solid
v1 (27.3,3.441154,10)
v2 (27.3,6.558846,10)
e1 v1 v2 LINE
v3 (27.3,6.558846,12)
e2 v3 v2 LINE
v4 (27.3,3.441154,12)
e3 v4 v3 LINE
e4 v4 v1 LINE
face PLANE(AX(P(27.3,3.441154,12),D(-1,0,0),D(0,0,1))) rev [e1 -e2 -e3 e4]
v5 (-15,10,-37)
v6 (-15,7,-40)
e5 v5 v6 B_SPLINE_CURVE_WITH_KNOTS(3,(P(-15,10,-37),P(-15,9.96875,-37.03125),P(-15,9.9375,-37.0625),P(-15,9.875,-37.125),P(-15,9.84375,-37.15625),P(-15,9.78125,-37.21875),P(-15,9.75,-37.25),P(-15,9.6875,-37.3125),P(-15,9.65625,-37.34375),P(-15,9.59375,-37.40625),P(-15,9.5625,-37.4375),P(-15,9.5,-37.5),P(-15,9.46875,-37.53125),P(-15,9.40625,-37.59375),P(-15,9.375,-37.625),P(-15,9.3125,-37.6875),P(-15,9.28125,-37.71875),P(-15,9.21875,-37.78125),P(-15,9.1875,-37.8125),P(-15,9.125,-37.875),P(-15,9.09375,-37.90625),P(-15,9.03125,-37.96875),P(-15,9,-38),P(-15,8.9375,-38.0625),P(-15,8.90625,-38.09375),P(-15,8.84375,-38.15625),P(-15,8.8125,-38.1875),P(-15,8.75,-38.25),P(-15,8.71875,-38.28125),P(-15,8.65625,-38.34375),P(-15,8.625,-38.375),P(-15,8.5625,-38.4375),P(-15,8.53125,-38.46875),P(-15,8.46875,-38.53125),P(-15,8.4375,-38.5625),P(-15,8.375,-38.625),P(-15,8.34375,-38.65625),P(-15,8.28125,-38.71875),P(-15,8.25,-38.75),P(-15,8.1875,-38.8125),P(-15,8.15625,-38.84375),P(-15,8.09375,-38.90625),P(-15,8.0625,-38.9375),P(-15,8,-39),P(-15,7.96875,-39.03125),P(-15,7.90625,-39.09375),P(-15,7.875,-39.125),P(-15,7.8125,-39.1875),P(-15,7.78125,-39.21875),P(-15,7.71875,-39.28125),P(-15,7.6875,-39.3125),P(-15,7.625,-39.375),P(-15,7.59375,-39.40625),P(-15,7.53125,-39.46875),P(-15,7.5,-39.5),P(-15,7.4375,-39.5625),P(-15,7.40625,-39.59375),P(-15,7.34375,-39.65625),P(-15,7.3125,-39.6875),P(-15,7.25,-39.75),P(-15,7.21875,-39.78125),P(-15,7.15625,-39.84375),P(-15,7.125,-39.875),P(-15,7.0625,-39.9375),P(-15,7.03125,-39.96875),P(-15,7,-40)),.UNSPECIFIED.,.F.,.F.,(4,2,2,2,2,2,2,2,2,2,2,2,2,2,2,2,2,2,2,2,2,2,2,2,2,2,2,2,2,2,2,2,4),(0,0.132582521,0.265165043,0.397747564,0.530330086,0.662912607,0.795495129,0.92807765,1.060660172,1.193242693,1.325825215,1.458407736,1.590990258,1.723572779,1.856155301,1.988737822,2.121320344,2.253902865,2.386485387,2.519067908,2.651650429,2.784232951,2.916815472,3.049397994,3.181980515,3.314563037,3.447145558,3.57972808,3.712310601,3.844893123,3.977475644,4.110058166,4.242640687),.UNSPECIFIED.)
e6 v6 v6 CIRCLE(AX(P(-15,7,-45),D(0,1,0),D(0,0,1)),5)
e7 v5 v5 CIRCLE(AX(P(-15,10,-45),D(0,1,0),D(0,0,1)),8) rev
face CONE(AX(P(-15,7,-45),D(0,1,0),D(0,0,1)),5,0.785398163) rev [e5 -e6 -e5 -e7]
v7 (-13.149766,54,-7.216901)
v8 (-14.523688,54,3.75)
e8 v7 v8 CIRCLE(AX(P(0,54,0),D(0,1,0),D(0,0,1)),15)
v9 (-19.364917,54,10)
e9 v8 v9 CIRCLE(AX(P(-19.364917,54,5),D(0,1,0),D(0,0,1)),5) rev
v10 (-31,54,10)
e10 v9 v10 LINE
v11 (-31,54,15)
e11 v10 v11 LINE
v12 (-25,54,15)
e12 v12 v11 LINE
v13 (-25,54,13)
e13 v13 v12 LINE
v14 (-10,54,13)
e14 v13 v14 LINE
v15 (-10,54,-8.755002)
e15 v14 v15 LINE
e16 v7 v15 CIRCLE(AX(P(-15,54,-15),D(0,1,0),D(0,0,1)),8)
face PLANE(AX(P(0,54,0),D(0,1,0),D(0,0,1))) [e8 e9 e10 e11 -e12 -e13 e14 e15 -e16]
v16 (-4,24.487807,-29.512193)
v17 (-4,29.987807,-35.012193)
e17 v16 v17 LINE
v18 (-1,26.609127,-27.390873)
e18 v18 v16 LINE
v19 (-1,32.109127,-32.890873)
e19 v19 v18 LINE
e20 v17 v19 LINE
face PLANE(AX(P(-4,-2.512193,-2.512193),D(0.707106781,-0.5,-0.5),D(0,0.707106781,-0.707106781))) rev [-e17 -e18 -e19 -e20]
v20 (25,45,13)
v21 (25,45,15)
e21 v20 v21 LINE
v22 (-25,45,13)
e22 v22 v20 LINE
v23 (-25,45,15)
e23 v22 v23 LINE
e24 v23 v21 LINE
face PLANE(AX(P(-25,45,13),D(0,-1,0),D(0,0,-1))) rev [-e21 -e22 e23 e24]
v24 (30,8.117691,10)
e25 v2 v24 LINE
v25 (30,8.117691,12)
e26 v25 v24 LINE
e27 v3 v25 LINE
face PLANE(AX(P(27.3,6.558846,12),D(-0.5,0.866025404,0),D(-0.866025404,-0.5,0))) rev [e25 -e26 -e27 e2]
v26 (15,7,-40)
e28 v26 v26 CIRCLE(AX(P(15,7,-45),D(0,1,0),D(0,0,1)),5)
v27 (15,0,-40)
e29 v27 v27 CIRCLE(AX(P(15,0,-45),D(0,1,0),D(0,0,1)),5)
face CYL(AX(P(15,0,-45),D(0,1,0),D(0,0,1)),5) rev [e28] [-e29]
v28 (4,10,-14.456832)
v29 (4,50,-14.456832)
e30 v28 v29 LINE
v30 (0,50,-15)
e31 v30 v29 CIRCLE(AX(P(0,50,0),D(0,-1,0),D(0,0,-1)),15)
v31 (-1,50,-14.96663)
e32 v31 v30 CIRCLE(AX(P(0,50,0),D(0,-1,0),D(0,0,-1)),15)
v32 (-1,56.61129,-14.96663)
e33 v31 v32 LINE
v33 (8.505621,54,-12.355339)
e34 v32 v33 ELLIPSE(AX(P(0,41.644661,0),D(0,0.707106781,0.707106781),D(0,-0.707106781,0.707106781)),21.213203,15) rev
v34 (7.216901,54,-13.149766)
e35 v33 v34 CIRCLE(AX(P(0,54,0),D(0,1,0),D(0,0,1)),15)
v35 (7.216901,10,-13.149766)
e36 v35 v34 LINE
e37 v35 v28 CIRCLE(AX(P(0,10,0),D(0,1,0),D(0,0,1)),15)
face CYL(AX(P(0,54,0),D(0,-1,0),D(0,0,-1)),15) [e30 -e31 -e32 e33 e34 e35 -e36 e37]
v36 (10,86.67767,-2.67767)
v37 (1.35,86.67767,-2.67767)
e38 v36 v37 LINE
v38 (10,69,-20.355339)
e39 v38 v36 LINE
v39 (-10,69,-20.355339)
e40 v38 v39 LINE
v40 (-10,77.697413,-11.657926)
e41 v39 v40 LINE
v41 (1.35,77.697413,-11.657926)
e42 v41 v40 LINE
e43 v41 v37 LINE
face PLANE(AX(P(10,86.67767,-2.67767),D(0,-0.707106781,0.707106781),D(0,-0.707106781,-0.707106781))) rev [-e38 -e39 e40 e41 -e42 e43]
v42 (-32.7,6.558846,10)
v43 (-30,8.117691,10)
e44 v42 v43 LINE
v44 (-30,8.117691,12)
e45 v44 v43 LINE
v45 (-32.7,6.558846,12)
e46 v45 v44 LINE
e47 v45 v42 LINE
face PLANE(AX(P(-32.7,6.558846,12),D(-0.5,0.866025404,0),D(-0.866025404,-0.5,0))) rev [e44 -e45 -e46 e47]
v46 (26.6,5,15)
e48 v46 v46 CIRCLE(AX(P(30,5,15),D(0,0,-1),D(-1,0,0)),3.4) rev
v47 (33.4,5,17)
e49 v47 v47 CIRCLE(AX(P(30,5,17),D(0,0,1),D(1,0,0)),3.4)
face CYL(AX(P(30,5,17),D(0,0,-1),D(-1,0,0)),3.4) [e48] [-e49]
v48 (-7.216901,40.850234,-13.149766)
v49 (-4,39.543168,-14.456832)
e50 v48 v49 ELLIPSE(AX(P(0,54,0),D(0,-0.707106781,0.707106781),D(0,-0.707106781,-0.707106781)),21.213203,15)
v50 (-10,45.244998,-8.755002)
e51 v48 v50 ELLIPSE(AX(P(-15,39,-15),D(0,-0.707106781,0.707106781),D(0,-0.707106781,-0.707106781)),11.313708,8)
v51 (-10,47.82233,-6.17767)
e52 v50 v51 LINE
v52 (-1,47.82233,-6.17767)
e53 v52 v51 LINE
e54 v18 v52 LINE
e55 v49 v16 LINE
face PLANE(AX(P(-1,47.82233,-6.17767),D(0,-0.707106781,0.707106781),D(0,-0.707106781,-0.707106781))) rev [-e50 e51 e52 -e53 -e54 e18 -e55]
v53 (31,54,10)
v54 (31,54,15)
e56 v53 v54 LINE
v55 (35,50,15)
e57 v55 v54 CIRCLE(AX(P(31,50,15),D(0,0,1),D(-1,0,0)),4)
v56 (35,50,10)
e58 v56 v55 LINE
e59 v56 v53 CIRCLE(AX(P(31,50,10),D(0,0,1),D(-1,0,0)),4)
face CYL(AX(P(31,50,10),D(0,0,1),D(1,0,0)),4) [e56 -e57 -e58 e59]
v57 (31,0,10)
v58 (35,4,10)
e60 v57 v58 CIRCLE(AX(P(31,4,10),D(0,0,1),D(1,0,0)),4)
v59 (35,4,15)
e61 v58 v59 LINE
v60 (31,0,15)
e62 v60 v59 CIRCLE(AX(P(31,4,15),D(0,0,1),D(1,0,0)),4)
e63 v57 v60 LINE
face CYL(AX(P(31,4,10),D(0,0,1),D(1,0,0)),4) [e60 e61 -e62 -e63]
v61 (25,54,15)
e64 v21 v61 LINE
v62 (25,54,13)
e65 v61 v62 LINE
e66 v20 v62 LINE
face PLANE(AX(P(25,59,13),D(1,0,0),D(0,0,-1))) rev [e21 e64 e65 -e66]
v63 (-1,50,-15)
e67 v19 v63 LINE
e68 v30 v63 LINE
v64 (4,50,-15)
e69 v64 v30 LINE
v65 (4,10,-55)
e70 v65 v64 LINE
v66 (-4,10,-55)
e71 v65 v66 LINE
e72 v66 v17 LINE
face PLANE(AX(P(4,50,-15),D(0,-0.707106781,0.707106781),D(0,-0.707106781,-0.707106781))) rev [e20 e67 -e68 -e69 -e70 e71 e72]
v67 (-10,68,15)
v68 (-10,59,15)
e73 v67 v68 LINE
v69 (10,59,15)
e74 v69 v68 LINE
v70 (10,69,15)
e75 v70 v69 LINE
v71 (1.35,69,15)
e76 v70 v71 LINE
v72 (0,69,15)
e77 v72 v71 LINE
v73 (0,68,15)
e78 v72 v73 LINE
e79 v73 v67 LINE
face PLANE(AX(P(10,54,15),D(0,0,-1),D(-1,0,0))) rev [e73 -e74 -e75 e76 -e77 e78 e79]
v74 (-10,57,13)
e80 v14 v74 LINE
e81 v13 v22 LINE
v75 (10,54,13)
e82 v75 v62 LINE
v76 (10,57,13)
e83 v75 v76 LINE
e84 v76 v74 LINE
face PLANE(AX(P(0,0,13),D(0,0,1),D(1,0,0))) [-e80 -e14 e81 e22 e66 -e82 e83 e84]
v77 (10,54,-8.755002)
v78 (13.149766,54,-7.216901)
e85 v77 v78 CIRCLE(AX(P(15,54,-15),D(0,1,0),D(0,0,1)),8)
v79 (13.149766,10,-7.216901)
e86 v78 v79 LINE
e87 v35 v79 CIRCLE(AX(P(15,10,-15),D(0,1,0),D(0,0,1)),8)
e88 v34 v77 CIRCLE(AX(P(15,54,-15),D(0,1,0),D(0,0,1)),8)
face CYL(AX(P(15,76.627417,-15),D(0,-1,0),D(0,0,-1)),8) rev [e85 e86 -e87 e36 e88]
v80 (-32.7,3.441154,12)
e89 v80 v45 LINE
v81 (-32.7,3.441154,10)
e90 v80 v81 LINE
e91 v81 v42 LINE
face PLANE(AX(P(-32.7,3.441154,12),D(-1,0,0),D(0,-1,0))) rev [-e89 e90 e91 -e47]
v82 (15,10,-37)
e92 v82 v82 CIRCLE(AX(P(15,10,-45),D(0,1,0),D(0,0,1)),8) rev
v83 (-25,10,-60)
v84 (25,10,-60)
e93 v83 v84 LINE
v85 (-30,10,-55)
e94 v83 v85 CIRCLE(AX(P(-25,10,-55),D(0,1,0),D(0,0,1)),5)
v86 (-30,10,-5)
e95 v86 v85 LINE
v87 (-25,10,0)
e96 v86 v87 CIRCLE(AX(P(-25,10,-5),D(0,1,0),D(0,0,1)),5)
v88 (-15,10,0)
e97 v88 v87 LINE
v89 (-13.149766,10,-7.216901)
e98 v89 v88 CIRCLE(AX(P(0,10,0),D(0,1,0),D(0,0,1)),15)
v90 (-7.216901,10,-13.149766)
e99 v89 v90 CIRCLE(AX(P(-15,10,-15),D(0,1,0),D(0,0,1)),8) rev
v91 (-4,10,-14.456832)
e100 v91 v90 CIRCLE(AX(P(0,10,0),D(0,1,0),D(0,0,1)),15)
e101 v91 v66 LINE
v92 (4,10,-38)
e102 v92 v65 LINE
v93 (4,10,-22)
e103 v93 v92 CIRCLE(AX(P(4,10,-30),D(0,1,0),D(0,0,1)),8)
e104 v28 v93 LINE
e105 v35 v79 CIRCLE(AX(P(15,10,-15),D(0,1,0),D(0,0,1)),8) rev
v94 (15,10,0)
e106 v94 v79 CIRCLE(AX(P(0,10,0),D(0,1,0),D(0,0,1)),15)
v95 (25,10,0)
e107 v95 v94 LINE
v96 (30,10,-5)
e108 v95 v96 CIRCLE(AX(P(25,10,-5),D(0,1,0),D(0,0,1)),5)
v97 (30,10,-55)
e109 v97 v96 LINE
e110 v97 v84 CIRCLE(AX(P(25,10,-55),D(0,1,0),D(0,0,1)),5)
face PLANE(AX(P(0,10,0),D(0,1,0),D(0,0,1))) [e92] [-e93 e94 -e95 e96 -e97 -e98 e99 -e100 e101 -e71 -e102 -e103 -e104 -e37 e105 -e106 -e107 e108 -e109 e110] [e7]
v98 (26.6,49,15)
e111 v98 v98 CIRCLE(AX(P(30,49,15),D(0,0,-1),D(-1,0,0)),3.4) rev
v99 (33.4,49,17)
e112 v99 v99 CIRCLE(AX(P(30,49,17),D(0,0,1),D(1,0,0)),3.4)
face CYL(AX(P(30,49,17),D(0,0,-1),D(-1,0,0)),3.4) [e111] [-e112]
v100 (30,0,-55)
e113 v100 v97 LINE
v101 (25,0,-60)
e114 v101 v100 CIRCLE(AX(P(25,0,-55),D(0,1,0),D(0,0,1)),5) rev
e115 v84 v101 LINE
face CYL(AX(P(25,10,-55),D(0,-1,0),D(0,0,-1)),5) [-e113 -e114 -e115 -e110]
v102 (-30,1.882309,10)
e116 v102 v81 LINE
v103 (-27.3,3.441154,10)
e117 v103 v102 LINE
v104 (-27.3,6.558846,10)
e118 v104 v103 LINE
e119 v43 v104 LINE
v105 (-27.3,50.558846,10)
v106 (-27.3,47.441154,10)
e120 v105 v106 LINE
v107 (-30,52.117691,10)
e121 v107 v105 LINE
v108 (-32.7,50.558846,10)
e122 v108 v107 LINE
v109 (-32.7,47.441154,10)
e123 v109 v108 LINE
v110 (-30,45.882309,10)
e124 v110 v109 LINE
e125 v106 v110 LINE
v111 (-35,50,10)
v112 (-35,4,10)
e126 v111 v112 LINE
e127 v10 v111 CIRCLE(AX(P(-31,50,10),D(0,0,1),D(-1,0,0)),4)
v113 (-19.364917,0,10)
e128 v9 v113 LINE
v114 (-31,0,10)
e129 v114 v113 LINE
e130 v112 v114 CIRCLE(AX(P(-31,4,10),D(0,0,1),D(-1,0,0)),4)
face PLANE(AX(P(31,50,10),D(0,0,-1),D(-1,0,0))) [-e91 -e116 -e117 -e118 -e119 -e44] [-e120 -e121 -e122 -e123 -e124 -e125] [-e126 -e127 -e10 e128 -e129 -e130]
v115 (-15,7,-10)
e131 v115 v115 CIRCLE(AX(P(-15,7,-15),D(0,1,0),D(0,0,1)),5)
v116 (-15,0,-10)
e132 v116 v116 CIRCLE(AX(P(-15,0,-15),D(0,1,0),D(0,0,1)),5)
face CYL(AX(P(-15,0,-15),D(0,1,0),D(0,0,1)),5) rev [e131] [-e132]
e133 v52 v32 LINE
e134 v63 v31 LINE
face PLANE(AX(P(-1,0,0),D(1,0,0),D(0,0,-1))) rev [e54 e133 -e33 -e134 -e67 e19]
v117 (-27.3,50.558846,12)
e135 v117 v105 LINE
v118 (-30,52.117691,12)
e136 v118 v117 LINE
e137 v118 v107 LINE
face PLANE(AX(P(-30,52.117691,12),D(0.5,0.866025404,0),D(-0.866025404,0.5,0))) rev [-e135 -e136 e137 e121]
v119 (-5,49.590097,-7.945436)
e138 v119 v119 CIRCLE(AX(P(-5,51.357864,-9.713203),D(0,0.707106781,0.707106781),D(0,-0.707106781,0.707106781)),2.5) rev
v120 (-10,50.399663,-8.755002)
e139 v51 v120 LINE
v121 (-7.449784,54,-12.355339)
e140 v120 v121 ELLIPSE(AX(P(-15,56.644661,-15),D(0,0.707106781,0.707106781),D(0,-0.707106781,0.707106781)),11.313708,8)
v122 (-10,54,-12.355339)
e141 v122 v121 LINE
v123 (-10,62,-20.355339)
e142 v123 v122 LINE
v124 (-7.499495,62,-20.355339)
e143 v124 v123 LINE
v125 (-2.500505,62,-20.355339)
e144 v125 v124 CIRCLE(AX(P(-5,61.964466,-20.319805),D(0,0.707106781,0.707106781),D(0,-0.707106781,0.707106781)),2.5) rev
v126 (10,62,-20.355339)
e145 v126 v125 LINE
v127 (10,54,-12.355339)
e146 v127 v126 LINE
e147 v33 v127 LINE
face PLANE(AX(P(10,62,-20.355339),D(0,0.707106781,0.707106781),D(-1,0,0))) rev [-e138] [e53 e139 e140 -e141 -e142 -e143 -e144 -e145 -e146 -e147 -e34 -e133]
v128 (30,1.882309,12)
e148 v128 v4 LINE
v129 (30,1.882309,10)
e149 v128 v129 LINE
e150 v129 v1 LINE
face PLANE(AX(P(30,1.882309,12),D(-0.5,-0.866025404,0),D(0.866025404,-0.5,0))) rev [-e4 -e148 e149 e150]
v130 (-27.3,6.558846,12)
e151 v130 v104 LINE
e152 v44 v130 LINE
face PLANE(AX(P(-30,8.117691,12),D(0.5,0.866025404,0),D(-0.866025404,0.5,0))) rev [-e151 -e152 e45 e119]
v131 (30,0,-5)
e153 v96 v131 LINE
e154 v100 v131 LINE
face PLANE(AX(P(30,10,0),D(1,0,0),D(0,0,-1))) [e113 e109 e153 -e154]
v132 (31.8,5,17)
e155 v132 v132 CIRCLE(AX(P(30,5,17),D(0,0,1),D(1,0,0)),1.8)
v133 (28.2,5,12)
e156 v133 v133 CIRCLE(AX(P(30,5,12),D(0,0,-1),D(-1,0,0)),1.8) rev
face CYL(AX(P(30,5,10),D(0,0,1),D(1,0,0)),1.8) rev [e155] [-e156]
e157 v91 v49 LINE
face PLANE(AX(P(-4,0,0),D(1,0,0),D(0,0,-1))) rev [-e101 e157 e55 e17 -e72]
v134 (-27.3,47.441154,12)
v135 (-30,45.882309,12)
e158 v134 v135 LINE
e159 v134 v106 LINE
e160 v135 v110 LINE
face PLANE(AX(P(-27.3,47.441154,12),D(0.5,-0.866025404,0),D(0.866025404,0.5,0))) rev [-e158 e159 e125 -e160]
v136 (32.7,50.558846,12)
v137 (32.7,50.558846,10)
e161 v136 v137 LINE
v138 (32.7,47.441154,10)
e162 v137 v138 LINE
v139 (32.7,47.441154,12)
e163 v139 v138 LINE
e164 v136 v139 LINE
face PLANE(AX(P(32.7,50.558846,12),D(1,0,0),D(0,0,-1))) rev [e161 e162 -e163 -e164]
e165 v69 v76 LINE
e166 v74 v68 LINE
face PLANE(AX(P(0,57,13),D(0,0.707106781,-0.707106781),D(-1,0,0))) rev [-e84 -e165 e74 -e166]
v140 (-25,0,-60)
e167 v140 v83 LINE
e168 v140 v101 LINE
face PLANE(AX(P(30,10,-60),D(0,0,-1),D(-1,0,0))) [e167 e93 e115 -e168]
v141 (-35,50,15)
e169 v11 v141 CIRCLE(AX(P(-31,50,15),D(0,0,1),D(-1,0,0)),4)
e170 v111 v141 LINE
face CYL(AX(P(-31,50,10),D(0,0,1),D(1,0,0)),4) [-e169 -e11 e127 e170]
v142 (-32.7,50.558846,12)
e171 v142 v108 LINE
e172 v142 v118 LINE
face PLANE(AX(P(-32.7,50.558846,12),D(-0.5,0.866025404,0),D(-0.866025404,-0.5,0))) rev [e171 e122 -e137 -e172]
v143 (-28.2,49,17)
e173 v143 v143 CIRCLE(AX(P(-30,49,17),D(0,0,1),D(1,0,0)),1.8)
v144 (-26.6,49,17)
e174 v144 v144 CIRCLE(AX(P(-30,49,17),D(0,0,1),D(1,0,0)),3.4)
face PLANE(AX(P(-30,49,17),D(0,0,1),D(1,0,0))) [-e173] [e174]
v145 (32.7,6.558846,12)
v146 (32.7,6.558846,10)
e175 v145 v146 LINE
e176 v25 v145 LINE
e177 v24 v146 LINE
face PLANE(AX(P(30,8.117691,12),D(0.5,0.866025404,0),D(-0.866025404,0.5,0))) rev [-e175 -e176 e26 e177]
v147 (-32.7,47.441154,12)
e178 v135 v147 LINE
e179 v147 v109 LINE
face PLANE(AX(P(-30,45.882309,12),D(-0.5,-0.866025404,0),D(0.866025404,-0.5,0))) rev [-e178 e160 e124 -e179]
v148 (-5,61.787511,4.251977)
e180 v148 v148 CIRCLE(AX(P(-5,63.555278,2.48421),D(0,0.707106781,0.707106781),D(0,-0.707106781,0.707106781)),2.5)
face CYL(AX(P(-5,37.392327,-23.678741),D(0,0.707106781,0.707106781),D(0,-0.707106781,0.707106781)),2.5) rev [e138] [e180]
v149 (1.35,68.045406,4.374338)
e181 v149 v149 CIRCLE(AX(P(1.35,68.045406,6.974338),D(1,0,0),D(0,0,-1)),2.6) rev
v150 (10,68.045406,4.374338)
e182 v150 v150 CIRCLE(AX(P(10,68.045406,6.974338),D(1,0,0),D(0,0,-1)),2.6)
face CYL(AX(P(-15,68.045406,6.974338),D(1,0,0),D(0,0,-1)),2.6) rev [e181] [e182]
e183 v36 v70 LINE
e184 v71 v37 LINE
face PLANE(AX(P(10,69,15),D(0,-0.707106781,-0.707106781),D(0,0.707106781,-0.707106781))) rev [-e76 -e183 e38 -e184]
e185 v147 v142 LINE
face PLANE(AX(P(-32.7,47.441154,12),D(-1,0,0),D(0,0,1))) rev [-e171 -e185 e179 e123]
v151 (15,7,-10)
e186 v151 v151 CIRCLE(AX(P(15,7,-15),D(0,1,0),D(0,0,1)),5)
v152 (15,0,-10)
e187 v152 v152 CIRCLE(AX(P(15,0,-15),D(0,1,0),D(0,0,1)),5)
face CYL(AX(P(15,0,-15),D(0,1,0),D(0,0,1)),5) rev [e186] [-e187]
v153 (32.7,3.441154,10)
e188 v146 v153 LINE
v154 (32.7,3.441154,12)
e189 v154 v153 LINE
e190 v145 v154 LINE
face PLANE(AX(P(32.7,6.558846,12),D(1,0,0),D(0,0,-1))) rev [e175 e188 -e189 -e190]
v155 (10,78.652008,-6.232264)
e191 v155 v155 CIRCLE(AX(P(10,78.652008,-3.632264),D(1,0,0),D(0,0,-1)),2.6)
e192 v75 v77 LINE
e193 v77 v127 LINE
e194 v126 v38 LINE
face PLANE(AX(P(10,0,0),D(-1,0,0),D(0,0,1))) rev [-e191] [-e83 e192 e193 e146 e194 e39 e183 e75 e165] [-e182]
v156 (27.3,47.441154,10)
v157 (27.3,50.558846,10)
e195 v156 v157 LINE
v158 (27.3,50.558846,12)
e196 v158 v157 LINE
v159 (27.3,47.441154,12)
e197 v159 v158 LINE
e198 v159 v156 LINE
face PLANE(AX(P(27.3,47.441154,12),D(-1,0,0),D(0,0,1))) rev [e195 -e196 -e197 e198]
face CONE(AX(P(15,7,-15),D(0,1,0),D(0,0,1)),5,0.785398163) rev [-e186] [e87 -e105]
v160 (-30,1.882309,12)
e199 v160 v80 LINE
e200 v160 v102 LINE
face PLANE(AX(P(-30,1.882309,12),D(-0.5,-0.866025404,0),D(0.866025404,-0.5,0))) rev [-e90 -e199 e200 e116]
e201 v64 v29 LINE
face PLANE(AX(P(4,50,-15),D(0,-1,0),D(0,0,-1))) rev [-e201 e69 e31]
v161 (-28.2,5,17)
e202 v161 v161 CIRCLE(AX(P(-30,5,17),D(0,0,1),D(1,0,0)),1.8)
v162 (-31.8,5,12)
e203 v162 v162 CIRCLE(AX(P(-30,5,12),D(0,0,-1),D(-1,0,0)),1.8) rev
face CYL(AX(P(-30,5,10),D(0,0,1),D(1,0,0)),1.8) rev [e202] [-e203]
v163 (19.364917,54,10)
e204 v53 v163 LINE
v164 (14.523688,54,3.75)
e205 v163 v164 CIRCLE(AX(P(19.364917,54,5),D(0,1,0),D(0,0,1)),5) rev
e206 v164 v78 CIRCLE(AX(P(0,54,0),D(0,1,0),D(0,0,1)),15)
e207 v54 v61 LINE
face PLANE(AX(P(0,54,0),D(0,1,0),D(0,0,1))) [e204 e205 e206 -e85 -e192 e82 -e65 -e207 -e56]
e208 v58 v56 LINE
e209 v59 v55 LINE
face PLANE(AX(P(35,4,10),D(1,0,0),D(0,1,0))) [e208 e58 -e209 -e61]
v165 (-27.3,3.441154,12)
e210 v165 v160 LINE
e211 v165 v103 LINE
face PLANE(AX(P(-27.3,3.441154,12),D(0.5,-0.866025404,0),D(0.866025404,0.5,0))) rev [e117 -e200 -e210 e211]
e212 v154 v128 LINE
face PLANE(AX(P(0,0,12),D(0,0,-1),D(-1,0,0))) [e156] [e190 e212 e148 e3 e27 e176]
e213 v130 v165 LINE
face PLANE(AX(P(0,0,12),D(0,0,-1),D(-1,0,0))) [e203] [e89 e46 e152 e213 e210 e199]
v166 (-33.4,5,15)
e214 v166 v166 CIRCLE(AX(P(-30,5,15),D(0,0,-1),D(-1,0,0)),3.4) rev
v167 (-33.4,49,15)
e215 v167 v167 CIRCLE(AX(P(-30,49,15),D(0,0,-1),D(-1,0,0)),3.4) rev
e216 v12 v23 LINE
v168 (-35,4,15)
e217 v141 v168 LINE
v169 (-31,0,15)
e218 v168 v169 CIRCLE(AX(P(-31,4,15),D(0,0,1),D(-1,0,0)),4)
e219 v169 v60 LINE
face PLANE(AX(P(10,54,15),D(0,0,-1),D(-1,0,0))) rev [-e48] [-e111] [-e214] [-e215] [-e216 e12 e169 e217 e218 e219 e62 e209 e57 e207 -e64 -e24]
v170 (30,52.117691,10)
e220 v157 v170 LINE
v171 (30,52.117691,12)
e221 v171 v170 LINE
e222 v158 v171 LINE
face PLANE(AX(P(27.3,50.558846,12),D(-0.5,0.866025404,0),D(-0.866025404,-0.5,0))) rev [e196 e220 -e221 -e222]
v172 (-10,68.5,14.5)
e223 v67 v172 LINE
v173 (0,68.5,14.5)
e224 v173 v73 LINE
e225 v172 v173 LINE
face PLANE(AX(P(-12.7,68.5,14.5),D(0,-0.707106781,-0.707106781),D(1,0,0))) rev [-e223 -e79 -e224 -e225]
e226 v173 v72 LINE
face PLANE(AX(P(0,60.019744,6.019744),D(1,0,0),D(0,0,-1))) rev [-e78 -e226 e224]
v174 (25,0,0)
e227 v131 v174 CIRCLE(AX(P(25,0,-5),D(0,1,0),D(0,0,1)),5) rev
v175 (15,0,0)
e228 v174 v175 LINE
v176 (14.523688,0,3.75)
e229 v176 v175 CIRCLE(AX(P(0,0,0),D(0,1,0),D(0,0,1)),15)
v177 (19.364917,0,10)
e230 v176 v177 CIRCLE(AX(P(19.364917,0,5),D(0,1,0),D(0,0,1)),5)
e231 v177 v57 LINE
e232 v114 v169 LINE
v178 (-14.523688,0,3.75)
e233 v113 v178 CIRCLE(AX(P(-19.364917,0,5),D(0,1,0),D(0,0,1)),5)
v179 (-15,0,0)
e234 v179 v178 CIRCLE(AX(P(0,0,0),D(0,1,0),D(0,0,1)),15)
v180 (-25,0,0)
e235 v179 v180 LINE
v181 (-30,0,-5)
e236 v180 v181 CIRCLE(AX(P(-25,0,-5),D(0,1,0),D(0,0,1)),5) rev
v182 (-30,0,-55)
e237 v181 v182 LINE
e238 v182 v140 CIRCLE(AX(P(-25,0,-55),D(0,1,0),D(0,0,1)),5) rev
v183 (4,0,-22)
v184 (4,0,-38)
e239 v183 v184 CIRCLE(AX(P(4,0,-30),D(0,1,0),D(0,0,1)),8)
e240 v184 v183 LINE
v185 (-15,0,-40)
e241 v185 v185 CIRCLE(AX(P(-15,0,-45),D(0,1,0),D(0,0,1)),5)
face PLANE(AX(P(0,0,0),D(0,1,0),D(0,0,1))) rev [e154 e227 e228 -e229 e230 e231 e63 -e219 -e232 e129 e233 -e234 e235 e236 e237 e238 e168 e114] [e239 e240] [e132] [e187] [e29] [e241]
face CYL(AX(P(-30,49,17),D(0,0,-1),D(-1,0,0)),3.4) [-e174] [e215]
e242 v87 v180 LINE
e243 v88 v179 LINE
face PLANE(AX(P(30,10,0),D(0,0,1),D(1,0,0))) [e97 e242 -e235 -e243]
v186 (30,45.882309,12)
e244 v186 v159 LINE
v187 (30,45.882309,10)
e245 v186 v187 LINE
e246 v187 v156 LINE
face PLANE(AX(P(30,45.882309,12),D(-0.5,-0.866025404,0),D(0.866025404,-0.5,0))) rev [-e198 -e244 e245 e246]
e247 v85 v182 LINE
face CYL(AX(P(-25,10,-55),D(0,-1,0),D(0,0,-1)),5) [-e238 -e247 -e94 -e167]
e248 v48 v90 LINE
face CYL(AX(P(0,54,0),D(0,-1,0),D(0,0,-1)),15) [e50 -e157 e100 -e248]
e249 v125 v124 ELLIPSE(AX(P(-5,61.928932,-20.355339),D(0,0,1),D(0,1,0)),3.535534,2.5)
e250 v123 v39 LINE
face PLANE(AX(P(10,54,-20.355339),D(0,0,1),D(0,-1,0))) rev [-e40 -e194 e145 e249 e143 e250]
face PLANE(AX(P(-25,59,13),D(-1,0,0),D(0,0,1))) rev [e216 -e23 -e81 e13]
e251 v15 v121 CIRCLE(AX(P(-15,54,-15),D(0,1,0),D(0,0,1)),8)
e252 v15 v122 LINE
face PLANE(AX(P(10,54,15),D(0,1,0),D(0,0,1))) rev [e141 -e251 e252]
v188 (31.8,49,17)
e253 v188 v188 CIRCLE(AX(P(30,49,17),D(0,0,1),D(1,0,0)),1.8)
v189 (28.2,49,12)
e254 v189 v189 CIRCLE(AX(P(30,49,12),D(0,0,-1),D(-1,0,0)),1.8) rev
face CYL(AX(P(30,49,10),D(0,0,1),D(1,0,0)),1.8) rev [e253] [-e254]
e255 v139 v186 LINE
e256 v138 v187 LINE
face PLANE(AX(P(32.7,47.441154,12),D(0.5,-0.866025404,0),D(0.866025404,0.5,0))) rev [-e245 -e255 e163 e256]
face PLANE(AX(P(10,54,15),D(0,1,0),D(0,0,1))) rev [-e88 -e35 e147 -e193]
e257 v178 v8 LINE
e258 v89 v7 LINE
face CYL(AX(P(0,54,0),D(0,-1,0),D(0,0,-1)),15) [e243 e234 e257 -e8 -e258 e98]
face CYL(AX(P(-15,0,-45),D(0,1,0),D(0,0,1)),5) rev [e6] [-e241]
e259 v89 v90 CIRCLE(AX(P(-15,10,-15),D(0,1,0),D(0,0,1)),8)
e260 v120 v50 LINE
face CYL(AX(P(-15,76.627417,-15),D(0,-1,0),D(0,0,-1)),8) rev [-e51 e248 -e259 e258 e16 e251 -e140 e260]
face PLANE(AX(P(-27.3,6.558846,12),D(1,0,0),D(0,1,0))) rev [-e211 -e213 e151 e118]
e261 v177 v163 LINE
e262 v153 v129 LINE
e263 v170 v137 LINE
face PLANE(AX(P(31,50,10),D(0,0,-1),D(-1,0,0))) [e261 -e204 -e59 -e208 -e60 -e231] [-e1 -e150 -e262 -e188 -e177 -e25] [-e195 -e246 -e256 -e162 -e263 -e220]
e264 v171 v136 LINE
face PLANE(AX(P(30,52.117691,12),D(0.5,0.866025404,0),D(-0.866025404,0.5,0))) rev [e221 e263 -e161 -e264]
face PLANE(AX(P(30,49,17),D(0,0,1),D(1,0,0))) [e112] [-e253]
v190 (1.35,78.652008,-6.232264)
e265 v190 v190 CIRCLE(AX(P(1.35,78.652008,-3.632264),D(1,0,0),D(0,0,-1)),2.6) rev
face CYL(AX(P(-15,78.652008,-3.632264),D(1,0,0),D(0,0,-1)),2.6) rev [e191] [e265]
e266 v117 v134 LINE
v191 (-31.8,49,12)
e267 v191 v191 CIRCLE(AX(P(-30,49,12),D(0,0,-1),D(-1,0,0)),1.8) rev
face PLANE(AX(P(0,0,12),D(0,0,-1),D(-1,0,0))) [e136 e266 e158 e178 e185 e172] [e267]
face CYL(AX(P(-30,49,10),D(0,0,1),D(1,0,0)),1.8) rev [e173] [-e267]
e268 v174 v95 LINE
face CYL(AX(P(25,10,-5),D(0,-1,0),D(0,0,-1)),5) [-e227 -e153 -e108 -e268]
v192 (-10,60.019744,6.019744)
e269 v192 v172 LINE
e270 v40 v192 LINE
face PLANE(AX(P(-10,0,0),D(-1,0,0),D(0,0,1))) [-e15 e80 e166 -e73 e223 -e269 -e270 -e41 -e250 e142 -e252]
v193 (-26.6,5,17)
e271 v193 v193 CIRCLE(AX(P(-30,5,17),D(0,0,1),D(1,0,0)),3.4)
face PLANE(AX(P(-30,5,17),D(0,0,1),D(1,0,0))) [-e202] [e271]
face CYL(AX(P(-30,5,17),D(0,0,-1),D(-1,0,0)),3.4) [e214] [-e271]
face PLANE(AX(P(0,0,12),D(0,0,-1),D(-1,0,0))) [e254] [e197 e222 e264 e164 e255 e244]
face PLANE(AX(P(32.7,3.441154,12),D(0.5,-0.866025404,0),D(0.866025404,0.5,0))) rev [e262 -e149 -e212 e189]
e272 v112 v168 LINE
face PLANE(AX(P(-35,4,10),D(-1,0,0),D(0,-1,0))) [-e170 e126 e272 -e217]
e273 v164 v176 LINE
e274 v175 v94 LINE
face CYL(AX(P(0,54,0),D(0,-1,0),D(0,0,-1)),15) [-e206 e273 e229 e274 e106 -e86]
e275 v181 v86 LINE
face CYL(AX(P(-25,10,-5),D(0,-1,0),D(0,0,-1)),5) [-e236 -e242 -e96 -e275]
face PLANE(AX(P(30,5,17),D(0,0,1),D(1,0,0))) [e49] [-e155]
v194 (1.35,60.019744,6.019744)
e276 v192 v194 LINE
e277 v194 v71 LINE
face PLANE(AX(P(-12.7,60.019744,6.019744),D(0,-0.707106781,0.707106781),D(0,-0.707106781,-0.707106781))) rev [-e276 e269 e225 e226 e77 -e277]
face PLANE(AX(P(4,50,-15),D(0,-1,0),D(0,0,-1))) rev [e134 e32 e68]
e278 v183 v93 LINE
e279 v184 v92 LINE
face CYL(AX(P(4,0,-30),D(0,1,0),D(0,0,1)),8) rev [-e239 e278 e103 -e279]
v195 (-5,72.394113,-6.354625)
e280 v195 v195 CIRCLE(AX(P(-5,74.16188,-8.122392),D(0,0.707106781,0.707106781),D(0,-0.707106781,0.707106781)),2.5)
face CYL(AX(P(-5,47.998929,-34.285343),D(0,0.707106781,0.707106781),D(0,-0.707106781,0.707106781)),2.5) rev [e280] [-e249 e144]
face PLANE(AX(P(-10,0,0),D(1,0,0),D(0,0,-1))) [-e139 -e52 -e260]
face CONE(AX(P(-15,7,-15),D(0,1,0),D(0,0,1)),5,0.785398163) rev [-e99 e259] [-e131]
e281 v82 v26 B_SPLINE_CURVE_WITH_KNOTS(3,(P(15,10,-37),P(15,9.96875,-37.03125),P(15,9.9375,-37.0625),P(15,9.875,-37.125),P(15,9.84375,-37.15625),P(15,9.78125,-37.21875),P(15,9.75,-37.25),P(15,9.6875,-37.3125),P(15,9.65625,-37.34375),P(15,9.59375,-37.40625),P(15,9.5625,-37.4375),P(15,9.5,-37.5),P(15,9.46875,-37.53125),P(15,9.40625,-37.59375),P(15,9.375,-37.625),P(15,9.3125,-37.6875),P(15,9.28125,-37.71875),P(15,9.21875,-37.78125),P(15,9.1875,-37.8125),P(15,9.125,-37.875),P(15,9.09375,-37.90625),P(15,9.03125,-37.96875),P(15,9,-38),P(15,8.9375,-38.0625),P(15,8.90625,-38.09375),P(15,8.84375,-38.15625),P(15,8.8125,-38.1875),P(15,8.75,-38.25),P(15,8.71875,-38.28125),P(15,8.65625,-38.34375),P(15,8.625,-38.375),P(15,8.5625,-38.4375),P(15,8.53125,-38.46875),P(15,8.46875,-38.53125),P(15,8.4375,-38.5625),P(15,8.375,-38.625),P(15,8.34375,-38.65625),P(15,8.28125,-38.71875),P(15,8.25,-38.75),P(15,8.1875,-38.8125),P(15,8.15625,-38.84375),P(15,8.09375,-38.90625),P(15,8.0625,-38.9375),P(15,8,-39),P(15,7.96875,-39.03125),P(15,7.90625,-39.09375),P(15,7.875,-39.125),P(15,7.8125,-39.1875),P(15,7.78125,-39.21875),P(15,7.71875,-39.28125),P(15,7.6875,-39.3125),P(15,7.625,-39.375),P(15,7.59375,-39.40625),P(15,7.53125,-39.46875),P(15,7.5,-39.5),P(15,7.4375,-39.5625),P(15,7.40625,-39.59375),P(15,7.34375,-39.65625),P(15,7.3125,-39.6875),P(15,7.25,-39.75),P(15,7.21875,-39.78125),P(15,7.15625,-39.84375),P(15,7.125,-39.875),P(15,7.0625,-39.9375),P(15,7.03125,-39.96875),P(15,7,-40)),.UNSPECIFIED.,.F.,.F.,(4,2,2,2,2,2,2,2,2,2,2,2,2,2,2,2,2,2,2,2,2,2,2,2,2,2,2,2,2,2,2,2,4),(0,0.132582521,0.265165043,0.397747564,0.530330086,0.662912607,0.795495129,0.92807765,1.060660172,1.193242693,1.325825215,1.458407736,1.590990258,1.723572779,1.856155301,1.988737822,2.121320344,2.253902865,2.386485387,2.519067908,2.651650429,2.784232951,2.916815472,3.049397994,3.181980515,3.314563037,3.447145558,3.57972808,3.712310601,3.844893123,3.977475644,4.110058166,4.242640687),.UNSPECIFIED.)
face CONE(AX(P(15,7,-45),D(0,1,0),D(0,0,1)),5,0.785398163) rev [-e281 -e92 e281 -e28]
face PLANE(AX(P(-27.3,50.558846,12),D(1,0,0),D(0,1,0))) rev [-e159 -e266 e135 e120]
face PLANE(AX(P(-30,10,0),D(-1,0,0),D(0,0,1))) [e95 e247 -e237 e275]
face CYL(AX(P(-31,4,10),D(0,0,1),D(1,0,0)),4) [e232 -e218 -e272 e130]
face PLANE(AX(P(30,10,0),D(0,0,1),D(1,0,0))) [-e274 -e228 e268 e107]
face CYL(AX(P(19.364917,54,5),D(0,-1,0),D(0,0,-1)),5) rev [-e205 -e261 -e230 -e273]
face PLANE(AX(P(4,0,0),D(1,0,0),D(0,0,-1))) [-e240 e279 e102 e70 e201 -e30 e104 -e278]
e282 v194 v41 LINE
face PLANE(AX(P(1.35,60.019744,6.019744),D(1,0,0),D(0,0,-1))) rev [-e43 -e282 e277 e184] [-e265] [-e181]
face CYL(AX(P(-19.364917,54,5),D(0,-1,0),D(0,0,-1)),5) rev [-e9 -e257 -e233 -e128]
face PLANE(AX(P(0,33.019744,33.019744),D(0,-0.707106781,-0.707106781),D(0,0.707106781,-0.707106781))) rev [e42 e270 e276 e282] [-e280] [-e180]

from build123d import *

# Parameters (mm, degrees)
SKETCH1_R           = 15
BOSS_EXTRUDE1_DEPTH = 54
BOSS_EXTRUDE2_DEPTH = 10
SKETCH4_W           = 12.7
SKETCH4_H           = 25
CUT_EXTRUDE2_DEPTH  = 12.7
CHAMFER1_SIZE       = 1
CHAMFER1_SIZE2      = 0.707106781
SKETCH6_R           = 2.6
CUT_EXTRUDE3_DEPTH  = 93.478960977
SKETCH7_R           = 1.8
BOSS_EXTRUDE4_DEPTH = 5
FILLET1_R           = 5
SKETCH8_W           = 60
SKETCH8_H           = 60
BOSS_EXTRUDE5_DEPTH = 10
BOSS_EXTRUDE6_DEPTH = 4
FILLET2_R           = 5
SKETCH10_R          = 5
CUT_EXTRUDE4_DEPTH  = 104.462384491
CHAMFER2_SIZE       = 8
EXTRUDE_THIN1_START = 2
SKETCH11_R          = 3.4
SKETCH11_R_2        = 1.8
EXTRUDE_THIN1_DEPTH = 2
SKETCH12_W          = 50
SKETCH12_H          = 14
CUT_EXTRUDE5_DEPTH  = 2
CHAMFER3_SIZE       = 2
CUT_EXTRUDE6_DEPTH  = 2
SKETCH14_R          = 8
CUT_EXTRUDE7_DEPTH  = 44
CHAMFER4_SIZE       = 3
CUT_EXTRUDE8_DEPTH  = 104.462384491
SKETCH26_R          = 2.5
CUT_EXTRUDE16_DEPTH = 37
CUT_EXTRUDE17_DEPTH = 9
CHAMFER6_SIZE       = 3
SKETCH29_W          = 1.35
SKETCH29_H          = 25
CUT_EXTRUDE18_DEPTH = 12.7


# Some blends are built 0.0001 mm under size
with BuildPart() as part:
    # Sketch1 → Boss-Extrude1 (new body)
    with BuildSketch(Plane(origin=(0, 0, 0), x_dir=(1, 0, 0), z_dir=(0, 1, 0))):
        with Locations(Location((0, 0, 0), (0, 0, 270))):
            Circle(SKETCH1_R)
    extrude(amount=BOSS_EXTRUDE1_DEPTH)

    # Sketch2 → Boss-Extrude2 (add, symmetric)
    with BuildSketch(Plane(origin=(0, 0, 0), x_dir=(0, 0, -1), z_dir=(1, 0, 0))):
        Polygon((-15, 54), (20.355339059, 54), (20.355339059, 69), (2.67766953, 86.67766953), (-15, 69), align=None)
    extrude(amount=BOSS_EXTRUDE2_DEPTH, both=True)

    # Sketch4 → Cut-Extrude2 (cut)
    with BuildSketch(Plane(origin=(0, 42, 42), x_dir=(1, 0, 0), z_dir=(0, 0.7071067811865467, 0.7071067811865485))):
        with Locations((-6.35, 50.683766184)):
            Rectangle(SKETCH4_W, SKETCH4_H)
    extrude(amount=-CUT_EXTRUDE2_DEPTH, mode=Mode.SUBTRACT)

    # Chamfer1
    chamfer1_edges = [part.edges().sort_by_distance(p)[0] for p in [
        (-5, 69, 15),
    ]]
    chamfer1_side = [part.faces().sort_by_distance(p)[0] for p in [
        (0, 61.5, 15),
    ]]
    chamfer(chamfer1_edges, length=CHAMFER1_SIZE, length2=CHAMFER1_SIZE2, reference=chamfer1_side[0])

    # Sketch6 → Cut-Extrude3 (cut, through all)
    with BuildSketch(Plane(origin=(10, 0, 0), x_dir=(0, 0, -1), z_dir=(1, 0, 0))):
        with Locations((3.632263684, 78.652007563)):
            Circle(SKETCH6_R)
        with Locations((-6.974338034, 68.045405845)):
            Circle(SKETCH6_R)
    extrude(amount=-CUT_EXTRUDE3_DEPTH, mode=Mode.SUBTRACT)

    # Sketch7 → Boss-Extrude4 (add)
    with BuildSketch(Plane.XY.offset(15)):
        with BuildLine():
            Line((-31, 0), (31, 0))
            ThreePointArc((31, 0), (33.828427125, 1.171572875), (35, 4))
            Line((35, 4), (35, 50))
            ThreePointArc((35, 50), (33.828427125, 52.828427125), (31, 54))
            Line((31, 54), (-31, 54))
            ThreePointArc((-31, 54), (-33.828427125, 52.828427125), (-35, 50))
            Line((-35, 50), (-35, 4))
            ThreePointArc((-35, 4), (-33.828427125, 1.171572875), (-31, 0))
        make_face()
        with Locations((-30, 49)):
            Circle(SKETCH7_R, mode=Mode.SUBTRACT)
        with Locations((30, 49)):
            Circle(SKETCH7_R, mode=Mode.SUBTRACT)
        with Locations((30, 5)):
            Circle(SKETCH7_R, mode=Mode.SUBTRACT)
        with Locations((-30, 5)):
            Circle(SKETCH7_R, mode=Mode.SUBTRACT)
    extrude(amount=-BOSS_EXTRUDE4_DEPTH)

    # Fillet1
    fillet1_edges = [part.edges().sort_by_distance(p)[0] for p in [
        (11.180339887, 27, 10),
        (-11.180339887, 27, 10),
    ]]
    fillet(fillet1_edges, radius=FILLET1_R)

    # Sketch8 → Boss-Extrude5 (add)
    with BuildSketch(Plane.XZ):
        with Locations((0, -30)):
            Rectangle(SKETCH8_W, SKETCH8_H)
    extrude(amount=-BOSS_EXTRUDE5_DEPTH)

    # Sketch9 → Boss-Extrude6 (add, symmetric)
    with BuildSketch(Plane(origin=(0, 0, 0), x_dir=(0, 0, -1), z_dir=(1, 0, 0))):
        Polygon((15, 50), (55, 10), (10, 10), (10, 50), align=None)
    extrude(amount=BOSS_EXTRUDE6_DEPTH, both=True)

    # Fillet2
    fillet2_edges = [part.edges().sort_by_distance(p)[0] for p in [
        (-30, 5, 0),
        (30, 5, 0),
        (30, 5, -60),
        (-30, 5, -60),
    ]]
    fillet(fillet2_edges, radius=FILLET2_R)

    # Sketch10 → Cut-Extrude4 (cut, through all)
    with BuildSketch(Plane(origin=(0, 10, 0), x_dir=(1, 0, 0), z_dir=(0, 1, 0))):
        with Locations(Location((15, 45, 0), (0, 0, 270))):
            Circle(SKETCH10_R)
        with Locations(Location((-15, 45, 0), (0, 0, 270))):
            Circle(SKETCH10_R)
        with Locations(Location((-15, 15, 0), (0, 0, 270))):
            Circle(SKETCH10_R)
        with Locations(Location((15, 15, 0), (0, 0, 270))):
            Circle(SKETCH10_R)
    extrude(amount=-CUT_EXTRUDE4_DEPTH, mode=Mode.SUBTRACT)

    # Chamfer2
    # the kernel refuses this chamfer: 8 mm, written as the material it takes off along each edge
    with BuildSketch(Plane(origin=(-30.573463904, 54, -20.355339059), x_dir=(0, -0.027495876610586487, 0.9996219169112968), z_dir=(1, 0, 0))) as chamfer2_piece_1_section:
        Polygon((CHAMFER2_SIZE * 0.999621916911, -CHAMFER2_SIZE * 0.0274958766106), (-CHAMFER2_SIZE * 0.0274958766106, -CHAMFER2_SIZE * 0.999621916911), (0, 0), align=None)
    chamfer2_piece_1 = extrude(amount=61.146927807, mode=Mode.PRIVATE)
    chamfer2_piece_1 = chamfer2_piece_1 - Plane(origin=(0, 56.680646847, 0), x_dir=(0, 0, 1), z_dir=(0, -1, 0)) * Cylinder(15, 155, mode=Mode.PRIVATE)
    add(chamfer2_piece_1, mode=Mode.SUBTRACT)

    # Sketch11 → Extrude-Thin1 (add)
    # profile 1 of 4: a face of its own
    with BuildSketch(Plane.XY.offset(15).offset(EXTRUDE_THIN1_START)):
        with Locations((-30, 49)):
            Circle(SKETCH11_R)
        with Locations((-30, 49)):
            Circle(SKETCH11_R_2, mode=Mode.SUBTRACT)
    # profile 2 of 4: a face of its own
    with BuildSketch(Plane.XY.offset(15).offset(EXTRUDE_THIN1_START)):
        with Locations((30, 49)):
            Circle(SKETCH11_R)
        with Locations((30, 49)):
            Circle(SKETCH11_R_2, mode=Mode.SUBTRACT)
    # profile 3 of 4: a face of its own
    with BuildSketch(Plane.XY.offset(15).offset(EXTRUDE_THIN1_START)):
        with Locations((30, 5)):
            Circle(SKETCH11_R)
        with Locations((30, 5)):
            Circle(SKETCH11_R_2, mode=Mode.SUBTRACT)
    # profile 4 of 4: a face of its own
    with BuildSketch(Plane.XY.offset(15).offset(EXTRUDE_THIN1_START)):
        with Locations((-30, 5)):
            Circle(SKETCH11_R)
        with Locations((-30, 5)):
            Circle(SKETCH11_R_2, mode=Mode.SUBTRACT)
    extrude(amount=-EXTRUDE_THIN1_DEPTH)

    # Sketch12 → Cut-Extrude5 (cut)
    with BuildSketch(Plane.XY.offset(15)):
        with Locations((0, 52)):
            Rectangle(SKETCH12_W, SKETCH12_H)
    extrude(amount=-CUT_EXTRUDE5_DEPTH, mode=Mode.SUBTRACT)

    # Chamfer3
    chamfer3_edges = [part.edges().sort_by_distance(p)[0] for p in [
        (0, 59, 13),
    ]]
    chamfer(chamfer3_edges, length=CHAMFER3_SIZE - 0.0001)  # a hair under: the kernel refuses the full size

    # Sketch13 → Cut-Extrude6 (cut)
    with BuildSketch(Plane(origin=(0, 0, 10), x_dir=(-1, 0, 0), z_dir=(0, 0, -1))):
        Polygon((-30, 45.882308546), (-27.3, 47.441154273), (-27.3, 50.558845727), (-30, 52.117691454), (-32.7, 50.558845727), (-32.7, 47.441154273), align=None)
        Polygon((30, 45.882308546), (32.7, 47.441154273), (32.7, 50.558845727), (30, 52.117691454), (27.3, 50.558845727), (27.3, 47.441154273), align=None)
        Polygon((27.3, 6.558845727), (27.3, 3.441154273), (30, 1.882308546), (32.7, 3.441154273), (32.7, 6.558845727), (30, 8.117691454), align=None)
        Polygon((-32.7, 6.558845727), (-32.7, 3.441154273), (-30, 1.882308546), (-27.3, 3.441154273), (-27.3, 6.558845727), (-30, 8.117691454), align=None)
    extrude(amount=-CUT_EXTRUDE6_DEPTH, mode=Mode.SUBTRACT)

    # Sketch14 → Cut-Extrude7 (cut)
    with BuildSketch(Plane(origin=(0, 10, 0), x_dir=(1, 0, 0), z_dir=(0, 1, 0))):
        with Locations((15, 15)):
            Circle(SKETCH14_R)
        with Locations((-15, 15)):
            Circle(SKETCH14_R)
    extrude(amount=CUT_EXTRUDE7_DEPTH, mode=Mode.SUBTRACT)

    # Chamfer4
    chamfer4_edges = [part.edges().sort_by_distance(p)[0] for p in [
        (15, 10, -20),
        (-15, 10, -20),
        (-15, 10, -50),
        (15, 10, -50),
    ]]
    chamfer(chamfer4_edges, length=CHAMFER4_SIZE - 0.0001)  # a hair under: the kernel refuses the full size

    # Sketch15 → Cut-Extrude8 (cut, through all)
    with BuildSketch(Plane(origin=(0, 10, 0), x_dir=(1, 0, 0), z_dir=(0, 1, 0))):
        with BuildLine():
            Line((4, 22), (4, 38))
            ThreePointArc((4, 38), (12, 30), (4, 22))
        make_face()
    extrude(amount=-CUT_EXTRUDE8_DEPTH, mode=Mode.SUBTRACT)

    # Sketch26 → Cut-Extrude16 (cut)
    with BuildSketch(Plane(origin=(0, 33.019743879, 33.019743879), x_dir=(1, 0, 0), z_dir=(0, 0.7071067811865466, 0.7071067811865485))):
        with Locations(Location((-5, 58.183766184, 0), (0, 0, 270))):
            Circle(SKETCH26_R)
        with Locations(Location((-5, 43.183766184, 0), (0, 0, 270))):
            Circle(SKETCH26_R)
    extrude(amount=-CUT_EXTRUDE16_DEPTH, mode=Mode.SUBTRACT)

    # Sketch27 → Cut-Extrude17 (cut)
    with BuildSketch(Plane.ZY.offset(10)):
        Polygon((-20.355339059, 62), (-6.17766953, 47.82233047), (-27.390872965, 26.609127035), (-41.568542495, 40.786796564), align=None)
    extrude(amount=-CUT_EXTRUDE17_DEPTH, mode=Mode.SUBTRACT)

    # Chamfer6
    chamfer6_edges = [part.edges().sort_by_distance(p)[0] for p in [
        (-4, 29.359127035, -30.140872965),
    ]]
    chamfer(chamfer6_edges, length=CHAMFER6_SIZE - 0.0001)  # a hair under: the kernel refuses the full size

    # Sketch29 → Cut-Extrude18 (cut)
    with BuildSketch(Plane(origin=(0, 42, 42), x_dir=(1, 0, 0), z_dir=(0, 0.7071067811865461, 0.7071067811865489))):
        with Locations((0.675, 50.683766184)):
            Rectangle(SKETCH29_W, SKETCH29_H)
    extrude(amount=-CUT_EXTRUDE18_DEPTH, mode=Mode.SUBTRACT)


solid = part.part
